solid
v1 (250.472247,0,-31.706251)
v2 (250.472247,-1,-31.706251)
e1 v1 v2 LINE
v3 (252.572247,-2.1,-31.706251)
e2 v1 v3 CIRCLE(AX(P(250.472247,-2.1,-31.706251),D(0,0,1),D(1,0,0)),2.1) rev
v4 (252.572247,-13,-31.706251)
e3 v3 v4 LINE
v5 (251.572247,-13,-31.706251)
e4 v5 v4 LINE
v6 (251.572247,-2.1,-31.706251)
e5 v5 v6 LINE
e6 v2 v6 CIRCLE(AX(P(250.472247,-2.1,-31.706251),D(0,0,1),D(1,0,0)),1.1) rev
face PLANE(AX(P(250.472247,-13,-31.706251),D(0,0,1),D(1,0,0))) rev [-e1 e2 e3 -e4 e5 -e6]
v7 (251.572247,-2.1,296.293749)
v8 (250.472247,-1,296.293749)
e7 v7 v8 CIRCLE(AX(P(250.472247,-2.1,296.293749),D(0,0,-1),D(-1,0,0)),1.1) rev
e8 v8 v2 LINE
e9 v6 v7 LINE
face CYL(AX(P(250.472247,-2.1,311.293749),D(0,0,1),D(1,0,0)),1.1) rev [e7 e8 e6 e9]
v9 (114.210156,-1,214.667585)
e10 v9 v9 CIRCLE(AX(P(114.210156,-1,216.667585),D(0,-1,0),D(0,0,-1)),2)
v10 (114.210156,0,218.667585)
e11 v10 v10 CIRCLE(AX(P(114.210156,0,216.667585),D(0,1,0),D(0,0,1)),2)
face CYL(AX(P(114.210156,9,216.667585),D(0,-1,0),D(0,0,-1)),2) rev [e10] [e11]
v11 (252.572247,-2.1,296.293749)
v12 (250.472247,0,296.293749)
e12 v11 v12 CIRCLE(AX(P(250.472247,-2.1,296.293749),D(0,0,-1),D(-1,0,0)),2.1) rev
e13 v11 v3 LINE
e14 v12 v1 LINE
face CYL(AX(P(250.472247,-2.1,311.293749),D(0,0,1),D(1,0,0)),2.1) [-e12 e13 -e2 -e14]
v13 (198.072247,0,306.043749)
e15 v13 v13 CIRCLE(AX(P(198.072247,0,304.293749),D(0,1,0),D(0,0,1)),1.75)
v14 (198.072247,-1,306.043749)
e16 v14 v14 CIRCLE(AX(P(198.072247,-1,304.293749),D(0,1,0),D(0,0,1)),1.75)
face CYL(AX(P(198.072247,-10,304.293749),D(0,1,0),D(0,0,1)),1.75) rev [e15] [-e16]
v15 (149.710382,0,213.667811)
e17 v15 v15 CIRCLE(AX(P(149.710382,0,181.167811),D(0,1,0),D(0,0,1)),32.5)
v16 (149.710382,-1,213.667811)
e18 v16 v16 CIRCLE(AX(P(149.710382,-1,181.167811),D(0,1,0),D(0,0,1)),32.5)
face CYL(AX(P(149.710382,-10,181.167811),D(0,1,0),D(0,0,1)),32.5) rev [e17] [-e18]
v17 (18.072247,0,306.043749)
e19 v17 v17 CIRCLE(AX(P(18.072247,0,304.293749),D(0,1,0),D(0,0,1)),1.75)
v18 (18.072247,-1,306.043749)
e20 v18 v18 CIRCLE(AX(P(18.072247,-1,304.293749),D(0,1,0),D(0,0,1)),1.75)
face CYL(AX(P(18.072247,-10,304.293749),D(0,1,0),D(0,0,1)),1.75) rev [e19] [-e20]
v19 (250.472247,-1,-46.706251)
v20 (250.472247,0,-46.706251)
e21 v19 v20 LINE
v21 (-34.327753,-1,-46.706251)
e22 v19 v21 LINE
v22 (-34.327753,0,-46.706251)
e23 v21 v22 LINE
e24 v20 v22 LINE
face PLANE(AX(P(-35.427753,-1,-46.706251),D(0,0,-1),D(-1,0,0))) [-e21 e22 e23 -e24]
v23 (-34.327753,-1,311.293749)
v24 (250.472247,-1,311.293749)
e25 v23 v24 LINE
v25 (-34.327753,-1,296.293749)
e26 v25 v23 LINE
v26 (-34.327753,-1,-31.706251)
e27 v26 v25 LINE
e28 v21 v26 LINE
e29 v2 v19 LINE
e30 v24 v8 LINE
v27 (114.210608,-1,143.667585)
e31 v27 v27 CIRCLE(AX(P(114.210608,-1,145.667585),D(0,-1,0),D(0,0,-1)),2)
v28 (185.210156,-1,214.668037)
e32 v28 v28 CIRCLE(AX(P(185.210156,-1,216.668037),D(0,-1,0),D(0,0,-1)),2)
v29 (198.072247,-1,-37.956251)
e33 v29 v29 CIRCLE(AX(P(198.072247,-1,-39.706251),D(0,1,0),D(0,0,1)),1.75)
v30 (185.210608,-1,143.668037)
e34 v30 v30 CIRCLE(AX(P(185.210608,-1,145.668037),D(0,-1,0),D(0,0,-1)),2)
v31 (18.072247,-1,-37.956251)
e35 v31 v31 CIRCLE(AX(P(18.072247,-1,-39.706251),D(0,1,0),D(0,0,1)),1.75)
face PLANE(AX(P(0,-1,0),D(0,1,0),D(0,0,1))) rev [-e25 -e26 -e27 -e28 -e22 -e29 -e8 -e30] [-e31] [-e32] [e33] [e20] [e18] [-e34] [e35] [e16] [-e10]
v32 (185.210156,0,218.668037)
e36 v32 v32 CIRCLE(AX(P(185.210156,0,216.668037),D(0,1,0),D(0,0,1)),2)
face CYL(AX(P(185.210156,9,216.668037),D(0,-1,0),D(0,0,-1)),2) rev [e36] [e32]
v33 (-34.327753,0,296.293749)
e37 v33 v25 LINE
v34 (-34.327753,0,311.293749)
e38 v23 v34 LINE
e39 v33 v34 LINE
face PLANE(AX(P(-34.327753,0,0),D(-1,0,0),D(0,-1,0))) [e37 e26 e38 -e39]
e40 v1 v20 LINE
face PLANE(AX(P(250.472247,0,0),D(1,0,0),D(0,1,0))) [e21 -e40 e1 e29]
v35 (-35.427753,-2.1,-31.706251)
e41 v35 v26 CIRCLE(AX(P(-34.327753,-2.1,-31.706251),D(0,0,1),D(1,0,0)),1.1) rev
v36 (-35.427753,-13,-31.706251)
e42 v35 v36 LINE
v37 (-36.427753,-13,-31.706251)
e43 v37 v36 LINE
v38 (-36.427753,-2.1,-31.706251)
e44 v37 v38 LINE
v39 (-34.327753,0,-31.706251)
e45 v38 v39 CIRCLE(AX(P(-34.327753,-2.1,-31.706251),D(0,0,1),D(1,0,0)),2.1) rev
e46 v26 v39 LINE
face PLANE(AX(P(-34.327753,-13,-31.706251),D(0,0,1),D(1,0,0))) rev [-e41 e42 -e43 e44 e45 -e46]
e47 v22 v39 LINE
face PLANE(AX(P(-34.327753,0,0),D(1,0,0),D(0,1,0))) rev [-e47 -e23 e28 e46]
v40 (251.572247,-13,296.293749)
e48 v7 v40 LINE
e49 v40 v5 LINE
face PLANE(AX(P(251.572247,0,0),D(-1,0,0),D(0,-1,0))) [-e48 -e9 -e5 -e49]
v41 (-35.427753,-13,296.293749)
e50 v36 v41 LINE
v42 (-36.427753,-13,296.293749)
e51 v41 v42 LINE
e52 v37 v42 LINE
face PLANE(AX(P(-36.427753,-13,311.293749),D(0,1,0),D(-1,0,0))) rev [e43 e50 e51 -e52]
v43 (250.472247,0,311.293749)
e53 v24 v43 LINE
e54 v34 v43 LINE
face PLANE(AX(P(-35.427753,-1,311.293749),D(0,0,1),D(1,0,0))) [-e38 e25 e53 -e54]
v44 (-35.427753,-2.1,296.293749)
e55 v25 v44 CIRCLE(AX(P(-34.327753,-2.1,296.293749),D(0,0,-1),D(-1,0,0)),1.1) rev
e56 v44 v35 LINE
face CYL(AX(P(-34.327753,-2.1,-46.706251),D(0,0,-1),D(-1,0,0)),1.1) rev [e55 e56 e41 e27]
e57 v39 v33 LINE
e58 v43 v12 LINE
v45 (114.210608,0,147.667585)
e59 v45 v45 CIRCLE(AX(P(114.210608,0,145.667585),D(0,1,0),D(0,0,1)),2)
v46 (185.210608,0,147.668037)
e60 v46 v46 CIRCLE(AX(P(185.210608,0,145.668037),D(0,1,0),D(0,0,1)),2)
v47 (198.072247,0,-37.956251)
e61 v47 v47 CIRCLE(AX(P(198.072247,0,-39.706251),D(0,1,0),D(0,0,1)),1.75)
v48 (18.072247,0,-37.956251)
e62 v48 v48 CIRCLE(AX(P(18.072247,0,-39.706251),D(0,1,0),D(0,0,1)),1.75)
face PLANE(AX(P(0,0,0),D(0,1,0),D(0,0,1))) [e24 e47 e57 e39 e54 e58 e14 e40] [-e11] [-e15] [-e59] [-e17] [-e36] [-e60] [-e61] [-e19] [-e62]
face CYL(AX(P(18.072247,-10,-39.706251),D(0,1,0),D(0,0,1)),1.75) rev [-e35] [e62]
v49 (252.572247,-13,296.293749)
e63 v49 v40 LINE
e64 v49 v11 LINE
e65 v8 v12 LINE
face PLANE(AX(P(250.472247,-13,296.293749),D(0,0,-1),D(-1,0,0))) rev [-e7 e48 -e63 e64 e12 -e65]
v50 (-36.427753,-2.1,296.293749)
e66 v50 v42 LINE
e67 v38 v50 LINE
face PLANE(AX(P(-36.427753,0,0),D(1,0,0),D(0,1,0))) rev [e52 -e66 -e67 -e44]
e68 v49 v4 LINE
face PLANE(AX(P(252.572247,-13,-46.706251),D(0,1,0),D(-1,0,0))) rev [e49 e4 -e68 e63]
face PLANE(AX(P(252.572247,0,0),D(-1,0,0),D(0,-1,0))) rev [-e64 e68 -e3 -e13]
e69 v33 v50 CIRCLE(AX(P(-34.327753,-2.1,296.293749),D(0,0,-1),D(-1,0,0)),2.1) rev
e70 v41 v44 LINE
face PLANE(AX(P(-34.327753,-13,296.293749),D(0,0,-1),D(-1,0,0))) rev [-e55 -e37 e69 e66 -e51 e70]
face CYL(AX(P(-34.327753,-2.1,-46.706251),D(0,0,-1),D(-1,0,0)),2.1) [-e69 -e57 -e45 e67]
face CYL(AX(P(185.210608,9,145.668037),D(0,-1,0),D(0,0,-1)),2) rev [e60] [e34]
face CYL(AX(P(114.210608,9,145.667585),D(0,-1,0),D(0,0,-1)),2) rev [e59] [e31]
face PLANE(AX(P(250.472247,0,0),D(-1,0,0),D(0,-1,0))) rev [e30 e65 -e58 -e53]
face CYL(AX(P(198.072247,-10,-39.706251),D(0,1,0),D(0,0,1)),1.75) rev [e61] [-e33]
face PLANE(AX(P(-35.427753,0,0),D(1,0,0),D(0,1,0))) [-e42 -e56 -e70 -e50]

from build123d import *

# Parameters (mm, degrees)
SKETCH_1_W                         = 287
SKETCH_1_H                         = 358
SM_BASE_FLANGE_1_DEPTH             = 1
SM_EDGE_FLANGE_1_STRIP_W           = 6.2
SM_EDGE_FLANGE_1_STRIP_H           = 1
SM_EDGE_FLANGE_1_STRIP_CUT_DEPTH   = 358
SM_EDGE_FLANGE_1_STRIP_2_W         = 6.2
SM_EDGE_FLANGE_1_STRIP_2_H         = 1
SM_EDGE_FLANGE_1_STRIP_CUT_2_DEPTH = 358
SM_EDGE_FLANGE_1_DEPTH             = 358
SM_EDGE_FLANGE_1_BEND_DEPTH        = 358
SKETCH_10_W                        = 15
SKETCH_10_H                        = 15
CUT_EXTRUDE_2_DEPTH                = 2.1
SKETCH_11_W                        = 15
SKETCH_11_H                        = 14.697316693
CUT_EXTRUDE_3_DEPTH                = 2.1
SKETCH_12_W                        = 15
SKETCH_12_H                        = 14.830573141
CUT_EXTRUDE_4_DEPTH                = 2.1
SKETCH_13_W                        = 15
SKETCH_13_H                        = 16.610777732
CUT_EXTRUDE_5_DEPTH                = 2.1
SKETCH_14_R                        = 1.75
CUT_EXTRUDE_6_DEPTH                = 10
SKETCH_15_R                        = 32.5
CUT_EXTRUDE_7_DEPTH                = 10
SKETCH_16_R                        = 2
CUT_EXTRUDE_8_DEPTH                = 10


# Sheet-metal steps are written as plain solids
with BuildPart() as part:
    # Sketch 1 → Базовая кромка1 (new body)
    with BuildSketch(Plane(origin=(0, 0, 0), x_dir=(1, 0, 0), z_dir=(0, 1, 0))):
        with Locations((108.072246785, -132.29374857)):
            Rectangle(SKETCH_1_W, SKETCH_1_H)
    extrude(amount=-SM_BASE_FLANGE_1_DEPTH)

    # Ребро-кромка1 strip (across the edge) → Ребро-кромка1 strip cut (cut)
    with BuildSketch(Plane(origin=(251.572246785, -1, -46.70625143), x_dir=(-1, 0, 0), z_dir=(0, 0, 1))):
        with Locations((-2, -0.5)):
            Rectangle(SM_EDGE_FLANGE_1_STRIP_W, SM_EDGE_FLANGE_1_STRIP_H)
    extrude(amount=SM_EDGE_FLANGE_1_STRIP_CUT_DEPTH, mode=Mode.SUBTRACT)

    # Ребро-кромка1 strip 2 (across the edge) → Ребро-кромка1 strip cut 2 (cut)
    with BuildSketch(Plane(origin=(-35.427753215, -1, 311.29374857), x_dir=(1, 0, 0), z_dir=(0, 0, -1))):
        with Locations((-2, -0.5)):
            Rectangle(SM_EDGE_FLANGE_1_STRIP_2_W, SM_EDGE_FLANGE_1_STRIP_2_H)
    extrude(amount=SM_EDGE_FLANGE_1_STRIP_CUT_2_DEPTH, mode=Mode.SUBTRACT)

    # Ребро-кромка1 section (across the edge) → Ребро-кромка1 (add)
    with BuildSketch(Plane(origin=(251.572246785, -1, -46.70625143), x_dir=(-1, 0, 0), z_dir=(0, 0, 1))):
        with BuildLine():
            Line((-1, 1.1), (-1, 12))
            Line((-1, 12), (0, 12))
            Line((0, 12), (0, 1.1))
            ThreePointArc((0, 1.1), (0.322182541, 0.322182541), (1.1, 0))
            Line((1.1, 0), (1.1, -1))
            ThreePointArc((1.1, -1), (-0.38492424, -0.38492424), (-1, 1.1))
        make_face()
    extrude(amount=SM_EDGE_FLANGE_1_DEPTH)

    # Ребро-кромка1 section 2 (across the edge) → Ребро-кромка1 bend (add)
    with BuildSketch(Plane(origin=(-35.427753215, -1, 311.29374857), x_dir=(1, 0, 0), z_dir=(0, 0, -1))):
        with BuildLine():
            Line((-1, 1.1), (-1, 12))
            Line((-1, 12), (0, 12))
            Line((0, 12), (0, 1.1))
            ThreePointArc((0, 1.1), (0.322182541, 0.322182541), (1.1, 0))
            Line((1.1, 0), (1.1, -1))
            ThreePointArc((1.1, -1), (-0.38492424, -0.38492424), (-1, 1.1))
        make_face()
    extrude(amount=SM_EDGE_FLANGE_1_BEND_DEPTH)

    # Эскиз10 → Вырез-Вытянуть2 (cut)
    with BuildSketch(Plane(origin=(252.572246785, 0, 0), x_dir=(0, 0, -1), z_dir=(1, 0, 0))):
        with Locations((39.20625143, -5.5)):
            Rectangle(SKETCH_10_W, SKETCH_10_H)
    extrude(amount=-CUT_EXTRUDE_2_DEPTH, mode=Mode.SUBTRACT)

    # Эскиз11 → Вырез-Вытянуть3 (cut)
    with BuildSketch(Plane(origin=(252.572246785, 0, 0), x_dir=(0, 0, -1), z_dir=(1, 0, 0))):
        with Locations((-303.79374857, -5.651341654)):
            Rectangle(SKETCH_11_W, SKETCH_11_H)
    extrude(amount=-CUT_EXTRUDE_3_DEPTH, mode=Mode.SUBTRACT)

    # Эскиз12 → Вырез-Вытянуть4 (cut)
    with BuildSketch(Plane.ZY.offset(36.427753215)):
        with Locations((303.79374857, -5.584713429)):
            Rectangle(SKETCH_12_W, SKETCH_12_H)
    extrude(amount=-CUT_EXTRUDE_4_DEPTH, mode=Mode.SUBTRACT)

    # Эскиз13 → Вырез-Вытянуть5 (cut)
    with BuildSketch(Plane.ZY.offset(36.427753215)):
        with Locations((-39.20625143, -4.694611134)):
            Rectangle(SKETCH_13_W, SKETCH_13_H)
    extrude(amount=-CUT_EXTRUDE_5_DEPTH, mode=Mode.SUBTRACT)

    # Эскиз14 → Вырез-Вытянуть6 (cut)
    with BuildSketch(Plane(origin=(0, 0, 0), x_dir=(1, 0, 0), z_dir=(0, 1, 0))):
        with Locations(Location((18.072246785, -304.29374857, 0), (0, 0, 270))):
            Circle(SKETCH_14_R)
        with Locations(Location((198.072246785, -304.29374857, 0), (0, 0, 270))):
            Circle(SKETCH_14_R)
        with Locations(Location((18.072246785, 39.70625143, 0), (0, 0, 270))):
            Circle(SKETCH_14_R)
        with Locations(Location((198.072246785, 39.70625143, 0), (0, 0, 270))):
            Circle(SKETCH_14_R)
    extrude(amount=-CUT_EXTRUDE_6_DEPTH, mode=Mode.SUBTRACT)

    # Эскиз15 → Вырез-Вытянуть7 (cut)
    with BuildSketch(Plane(origin=(0, 0, 0), x_dir=(1, 0, 0), z_dir=(0, 1, 0))):
        with Locations(Location((149.710381915, -181.167811182, 0), (0, 0, 270))):
            Circle(SKETCH_15_R)
    extrude(amount=-CUT_EXTRUDE_7_DEPTH, mode=Mode.SUBTRACT)

    # Эскиз16 → Вырез-Вытянуть8 (cut)
    with BuildSketch(Plane.XZ.offset(1)):
        with Locations(Location((114.21015579, 216.667585055, 0), (0, 0, 270))):
            Circle(SKETCH_16_R)
        with Locations(Location((185.210155788, 216.668037307, 0), (0, 0, 270))):
            Circle(SKETCH_16_R)
        with Locations(Location((114.210608042, 145.667585057, 0), (0, 0, 270))):
            Circle(SKETCH_16_R)
        with Locations(Location((185.21060804, 145.668037309, 0), (0, 0, 270))):
            Circle(SKETCH_16_R)
    extrude(amount=-CUT_EXTRUDE_8_DEPTH, mode=Mode.SUBTRACT)


solid = part.part
